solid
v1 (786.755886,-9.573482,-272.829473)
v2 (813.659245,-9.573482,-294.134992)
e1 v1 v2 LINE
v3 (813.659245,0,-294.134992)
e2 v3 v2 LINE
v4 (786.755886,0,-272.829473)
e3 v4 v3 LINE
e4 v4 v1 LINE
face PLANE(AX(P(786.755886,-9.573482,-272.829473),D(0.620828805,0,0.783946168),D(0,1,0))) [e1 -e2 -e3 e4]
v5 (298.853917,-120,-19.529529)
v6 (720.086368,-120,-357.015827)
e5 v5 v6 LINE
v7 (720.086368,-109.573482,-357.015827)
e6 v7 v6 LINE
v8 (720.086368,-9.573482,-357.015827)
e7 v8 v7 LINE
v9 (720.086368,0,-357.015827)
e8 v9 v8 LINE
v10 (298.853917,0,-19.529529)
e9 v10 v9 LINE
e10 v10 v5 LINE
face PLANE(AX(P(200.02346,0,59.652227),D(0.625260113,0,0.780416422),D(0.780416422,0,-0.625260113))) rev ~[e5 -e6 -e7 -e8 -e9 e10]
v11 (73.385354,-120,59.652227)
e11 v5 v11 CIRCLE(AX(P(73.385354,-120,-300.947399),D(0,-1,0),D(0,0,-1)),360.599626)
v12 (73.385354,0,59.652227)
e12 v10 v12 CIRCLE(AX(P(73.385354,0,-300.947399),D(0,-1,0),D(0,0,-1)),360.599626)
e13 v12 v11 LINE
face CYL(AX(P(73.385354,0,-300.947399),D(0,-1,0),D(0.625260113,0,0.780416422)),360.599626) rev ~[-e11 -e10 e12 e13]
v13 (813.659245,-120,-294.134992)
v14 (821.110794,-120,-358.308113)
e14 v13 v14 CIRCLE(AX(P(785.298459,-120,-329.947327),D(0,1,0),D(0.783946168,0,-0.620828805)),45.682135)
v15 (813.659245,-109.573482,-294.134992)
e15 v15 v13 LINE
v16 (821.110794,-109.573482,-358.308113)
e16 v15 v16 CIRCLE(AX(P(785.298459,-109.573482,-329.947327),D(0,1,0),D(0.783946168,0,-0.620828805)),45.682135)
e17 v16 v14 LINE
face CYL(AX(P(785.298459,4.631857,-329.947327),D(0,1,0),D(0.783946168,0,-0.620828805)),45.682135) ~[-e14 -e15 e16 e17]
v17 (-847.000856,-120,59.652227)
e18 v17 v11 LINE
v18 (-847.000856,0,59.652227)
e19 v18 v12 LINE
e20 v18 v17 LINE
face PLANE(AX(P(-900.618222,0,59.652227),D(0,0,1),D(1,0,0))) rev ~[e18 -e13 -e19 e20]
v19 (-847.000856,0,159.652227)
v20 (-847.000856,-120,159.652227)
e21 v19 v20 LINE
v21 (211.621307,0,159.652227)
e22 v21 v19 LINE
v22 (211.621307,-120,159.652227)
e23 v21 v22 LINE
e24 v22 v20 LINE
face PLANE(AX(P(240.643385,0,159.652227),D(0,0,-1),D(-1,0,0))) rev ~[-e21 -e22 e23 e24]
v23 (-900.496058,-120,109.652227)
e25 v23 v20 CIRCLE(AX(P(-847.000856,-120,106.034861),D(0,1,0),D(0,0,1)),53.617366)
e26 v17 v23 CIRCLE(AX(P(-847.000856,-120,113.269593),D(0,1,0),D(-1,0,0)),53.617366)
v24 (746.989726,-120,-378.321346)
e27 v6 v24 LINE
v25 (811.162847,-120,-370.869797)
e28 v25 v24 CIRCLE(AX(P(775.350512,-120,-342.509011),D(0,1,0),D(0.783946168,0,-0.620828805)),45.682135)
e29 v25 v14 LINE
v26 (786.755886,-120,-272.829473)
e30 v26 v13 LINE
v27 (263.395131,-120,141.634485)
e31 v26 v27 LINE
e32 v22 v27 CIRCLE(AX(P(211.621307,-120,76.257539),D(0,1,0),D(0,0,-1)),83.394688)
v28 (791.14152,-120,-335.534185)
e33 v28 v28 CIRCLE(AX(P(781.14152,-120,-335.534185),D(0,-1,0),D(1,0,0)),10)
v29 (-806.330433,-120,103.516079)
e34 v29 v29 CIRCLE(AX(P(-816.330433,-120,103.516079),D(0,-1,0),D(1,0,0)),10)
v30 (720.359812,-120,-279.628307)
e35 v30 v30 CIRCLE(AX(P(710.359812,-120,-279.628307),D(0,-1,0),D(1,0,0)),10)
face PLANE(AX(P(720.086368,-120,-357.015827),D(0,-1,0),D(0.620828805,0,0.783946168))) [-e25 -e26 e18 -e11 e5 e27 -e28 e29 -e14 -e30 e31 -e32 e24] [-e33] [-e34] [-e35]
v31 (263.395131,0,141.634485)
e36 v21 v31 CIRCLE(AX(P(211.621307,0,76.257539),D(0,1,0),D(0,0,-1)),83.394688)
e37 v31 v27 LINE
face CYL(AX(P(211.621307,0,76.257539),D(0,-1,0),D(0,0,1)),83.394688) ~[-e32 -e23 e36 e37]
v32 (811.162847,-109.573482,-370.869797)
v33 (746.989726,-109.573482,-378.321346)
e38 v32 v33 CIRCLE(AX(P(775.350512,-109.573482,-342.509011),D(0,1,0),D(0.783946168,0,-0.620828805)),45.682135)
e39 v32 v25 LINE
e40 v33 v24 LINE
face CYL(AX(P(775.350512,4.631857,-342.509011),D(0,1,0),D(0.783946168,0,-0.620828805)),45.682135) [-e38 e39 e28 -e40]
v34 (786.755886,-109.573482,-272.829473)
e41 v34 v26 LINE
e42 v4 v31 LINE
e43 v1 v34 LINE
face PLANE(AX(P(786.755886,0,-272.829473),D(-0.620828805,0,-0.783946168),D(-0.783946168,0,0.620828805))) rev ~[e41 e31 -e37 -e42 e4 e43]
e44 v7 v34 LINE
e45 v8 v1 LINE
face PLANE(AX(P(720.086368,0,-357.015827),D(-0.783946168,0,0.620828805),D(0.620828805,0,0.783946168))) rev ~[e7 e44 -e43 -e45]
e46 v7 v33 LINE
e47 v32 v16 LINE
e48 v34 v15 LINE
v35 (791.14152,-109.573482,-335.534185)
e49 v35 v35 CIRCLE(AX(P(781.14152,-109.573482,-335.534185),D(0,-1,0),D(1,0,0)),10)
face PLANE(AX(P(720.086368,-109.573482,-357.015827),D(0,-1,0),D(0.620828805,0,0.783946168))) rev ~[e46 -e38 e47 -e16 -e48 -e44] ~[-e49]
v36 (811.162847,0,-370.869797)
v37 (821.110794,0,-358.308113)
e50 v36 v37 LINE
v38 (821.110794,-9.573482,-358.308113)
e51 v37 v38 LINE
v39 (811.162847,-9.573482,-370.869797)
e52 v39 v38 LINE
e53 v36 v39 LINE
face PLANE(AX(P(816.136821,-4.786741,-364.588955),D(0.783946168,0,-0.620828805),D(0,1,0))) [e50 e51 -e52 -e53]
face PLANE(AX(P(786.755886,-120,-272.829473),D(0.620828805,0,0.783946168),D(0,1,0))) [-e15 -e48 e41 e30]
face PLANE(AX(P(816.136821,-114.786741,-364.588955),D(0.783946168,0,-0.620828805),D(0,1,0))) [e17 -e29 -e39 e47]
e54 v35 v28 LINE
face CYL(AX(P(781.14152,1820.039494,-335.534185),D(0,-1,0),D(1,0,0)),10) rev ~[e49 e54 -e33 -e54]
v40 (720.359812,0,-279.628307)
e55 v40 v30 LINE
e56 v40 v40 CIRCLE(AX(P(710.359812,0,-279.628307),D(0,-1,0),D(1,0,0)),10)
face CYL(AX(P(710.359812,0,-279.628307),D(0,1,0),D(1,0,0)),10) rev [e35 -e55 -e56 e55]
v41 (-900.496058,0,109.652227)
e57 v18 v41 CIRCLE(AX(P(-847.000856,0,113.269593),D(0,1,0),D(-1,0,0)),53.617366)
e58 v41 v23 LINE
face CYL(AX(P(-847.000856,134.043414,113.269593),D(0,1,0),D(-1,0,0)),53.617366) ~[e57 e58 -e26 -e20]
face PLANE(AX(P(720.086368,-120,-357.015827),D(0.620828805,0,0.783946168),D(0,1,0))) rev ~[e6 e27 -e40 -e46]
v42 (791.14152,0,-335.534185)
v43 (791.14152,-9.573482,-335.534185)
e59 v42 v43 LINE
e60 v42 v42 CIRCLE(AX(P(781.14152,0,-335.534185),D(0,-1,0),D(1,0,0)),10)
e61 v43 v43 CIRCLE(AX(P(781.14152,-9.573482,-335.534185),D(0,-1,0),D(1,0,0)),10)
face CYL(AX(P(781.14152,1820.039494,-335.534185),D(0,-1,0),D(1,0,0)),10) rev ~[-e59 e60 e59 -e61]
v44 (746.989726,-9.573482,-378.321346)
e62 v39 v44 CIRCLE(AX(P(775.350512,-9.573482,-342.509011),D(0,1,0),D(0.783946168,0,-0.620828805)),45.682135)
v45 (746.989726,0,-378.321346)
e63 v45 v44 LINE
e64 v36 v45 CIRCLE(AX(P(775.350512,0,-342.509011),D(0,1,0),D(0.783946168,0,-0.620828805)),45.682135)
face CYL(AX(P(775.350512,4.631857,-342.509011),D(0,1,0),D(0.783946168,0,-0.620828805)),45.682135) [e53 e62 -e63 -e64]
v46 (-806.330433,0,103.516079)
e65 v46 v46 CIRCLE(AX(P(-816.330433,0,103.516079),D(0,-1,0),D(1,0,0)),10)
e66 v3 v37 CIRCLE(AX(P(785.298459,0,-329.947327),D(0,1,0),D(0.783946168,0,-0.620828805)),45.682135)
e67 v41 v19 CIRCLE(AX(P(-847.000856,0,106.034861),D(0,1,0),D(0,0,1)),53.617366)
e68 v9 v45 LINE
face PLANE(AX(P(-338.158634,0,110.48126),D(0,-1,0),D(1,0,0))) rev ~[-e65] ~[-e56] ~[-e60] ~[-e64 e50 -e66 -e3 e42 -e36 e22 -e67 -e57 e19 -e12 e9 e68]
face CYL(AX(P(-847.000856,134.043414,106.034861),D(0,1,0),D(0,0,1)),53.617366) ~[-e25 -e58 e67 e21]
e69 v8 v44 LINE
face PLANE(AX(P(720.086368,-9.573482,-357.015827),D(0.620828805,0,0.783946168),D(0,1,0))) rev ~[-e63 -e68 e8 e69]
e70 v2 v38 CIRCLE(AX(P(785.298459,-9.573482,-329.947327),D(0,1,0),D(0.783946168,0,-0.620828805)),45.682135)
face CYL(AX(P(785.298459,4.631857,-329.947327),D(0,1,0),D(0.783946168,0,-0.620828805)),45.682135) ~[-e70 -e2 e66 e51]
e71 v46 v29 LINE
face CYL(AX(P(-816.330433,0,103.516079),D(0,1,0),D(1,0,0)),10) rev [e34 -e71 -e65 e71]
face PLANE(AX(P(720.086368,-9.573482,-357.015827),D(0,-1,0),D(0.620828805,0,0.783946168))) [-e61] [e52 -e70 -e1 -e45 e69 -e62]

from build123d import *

# Parameters (mm, degrees)
F0_R        = 10
F1_DEPTH    = 120
F2_T1_DEPTH = 388.0868278764
F3_R        = 83.3946881549
F4_R        = 360.5996262689
F5_W        = 10.426518289
F5_H        = 107.3879271778
F5_W_2      = 9.573481711
F6_DEPTH    = 80
F7_T1_DEPTH = 238.837194796
F7_T3_DEPTH = 237.984158218
F9_D        = 20


# Not quite as in the source:
# - a fillet or chamfer that OpenCascade refuses, or shapes differently, is made with other operations: its cross-section is extruded or revolved along the edge and cut away or added


with BuildPart() as f1:
    # F0 (on Front) → F1 (new body)
    with BuildSketch(Plane.XZ):
        Polygon((240.6433847223, 159.6522270207), (-900.6182220181, 159.6522270207), (-900.6182220181, 59.6522270207), (200.0234600665, 59.6522270207), align=None)
        with Locations((-816.3304328918, 103.5160794854)):
            Circle(F0_R, mode=Mode.SUBTRACT)
        Polygon((786.7558863362, -272.8294734313), (240.6433847223, 159.6522270207), (200.0234600665, 59.6522270207), (720.0863678131, -357.0158274528), align=None)
        with Locations((710.3598117828, -279.6283066273)):
            Circle(F0_R, mode=Mode.SUBTRACT)
    extrude(amount=F1_DEPTH)

    # F2: fillet of radius 53.6173655753 on 2 edges, made by hand

    # F2_s2 → F2_t1 (cut)
    with BuildSketch(Plane.XZ.offset(-134.0434139382)):
        with BuildLine():
            ThreePointArc((-847.0008564428, 159.6522270207), (-884.9140592305, 143.9480642331), (-900.6182220181, 106.0348614454))
            Line((-900.6182220181, 106.0348614454), (-900.6182220181, 159.6522270207))
            Line((-900.6182220181, 159.6522270207), (-847.0008564428, 159.6522270207))
        make_face()
        with BuildLine():
            ThreePointArc((-900.6182220181, 113.269592596), (-884.9140592305, 75.3563898084), (-847.0008564428, 59.6522270207))
            Line((-847.0008564428, 59.6522270207), (-900.6182220181, 59.6522270207))
            Line((-900.6182220181, 59.6522270207), (-900.6182220181, 113.269592596))
        make_face()
    extrude(amount=F2_T1_DEPTH, mode=Mode.SUBTRACT)

    # F3
    f3_edges = [f1.edges().sort_by_distance(p)[0] for p in [
        (240.643385, -60, 159.652227),
    ]]
    fillet(f3_edges, radius=F3_R)

    # F4
    f4_edges = [f1.edges().sort_by_distance(p)[0] for p in [
        (200.02346, -60, 59.652227),
    ]]
    fillet(f4_edges, radius=F4_R)

    # F5 (on face) → F6 (join)
    with BuildSketch(Plane(origin=(616.3029320724, 0, -488.0674572886), x_dir=(0, 1, 0), z_dir=(0.7839461682, 0, -0.6208288052))):
        with Locations((-114.7867408555, 220.8631330454)):
            Rectangle(F5_W, F5_H)
        with Locations((-4.7867408555, 220.8631330454)):
            Rectangle(F5_W_2, F5_H)
    extrude(amount=F6_DEPTH)

    # F7: fillet of radius 45.6821353014 on 5 edges, made by hand

    # F7_s2 → F7_t1 (cut)
    with BuildSketch(Plane.XZ.offset(-4.6318565425)):
        with BuildLine():
            ThreePointArc((811.1628467471, -370.8697969446), (780.6195529663, -387.886260073), (746.9897263442, -378.3213463908))
            Line((746.9897263442, -378.3213463908), (782.8020612687, -406.6821318691))
            Line((782.8020612687, -406.6821318691), (811.1628467471, -370.8697969446))
        make_face()
        with BuildLine():
            ThreePointArc((821.1107943135, -358.3081127721), (830.6757079957, -324.6782861501), (813.6592448673, -294.1349923693))
            Line((813.6592448673, -294.1349923693), (849.4715797918, -322.4957778476))
            Line((849.4715797918, -322.4957778476), (821.1107943135, -358.3081127721))
        make_face()
    extrude(amount=F7_T1_DEPTH, mode=Mode.SUBTRACT)

    # F7_s4 → F7_t3 (cut)
    with BuildSketch(Plane.XZ.offset(-114.2053382535)):
        with BuildLine():
            ThreePointArc((811.1628467471, -370.8697969446), (780.6195529663, -387.886260073), (746.9897263442, -378.3213463908))
            Line((746.9897263442, -378.3213463908), (782.8020612687, -406.6821318691))
            Line((782.8020612687, -406.6821318691), (811.1628467471, -370.8697969446))
        make_face()
        with BuildLine():
            ThreePointArc((813.6592448673, -294.1349923693), (830.6757079957, -324.6782861501), (821.1107943135, -358.3081127721))
            Line((821.1107943135, -358.3081127721), (849.4715797918, -322.4957778476))
            Line((849.4715797918, -322.4957778476), (813.6592448673, -294.1349923693))
        make_face()
    extrude(amount=F7_T3_DEPTH, mode=Mode.SUBTRACT)

    # F9 (through all)
    with Locations(Plane(origin=(0, 0, 0), x_dir=(-1, 0, 0), z_dir=(0, 1, 0))):
        with Locations((-781.1415195465, -335.5341851711)):
            Hole(F9_D / 2)


solid = f1.part
